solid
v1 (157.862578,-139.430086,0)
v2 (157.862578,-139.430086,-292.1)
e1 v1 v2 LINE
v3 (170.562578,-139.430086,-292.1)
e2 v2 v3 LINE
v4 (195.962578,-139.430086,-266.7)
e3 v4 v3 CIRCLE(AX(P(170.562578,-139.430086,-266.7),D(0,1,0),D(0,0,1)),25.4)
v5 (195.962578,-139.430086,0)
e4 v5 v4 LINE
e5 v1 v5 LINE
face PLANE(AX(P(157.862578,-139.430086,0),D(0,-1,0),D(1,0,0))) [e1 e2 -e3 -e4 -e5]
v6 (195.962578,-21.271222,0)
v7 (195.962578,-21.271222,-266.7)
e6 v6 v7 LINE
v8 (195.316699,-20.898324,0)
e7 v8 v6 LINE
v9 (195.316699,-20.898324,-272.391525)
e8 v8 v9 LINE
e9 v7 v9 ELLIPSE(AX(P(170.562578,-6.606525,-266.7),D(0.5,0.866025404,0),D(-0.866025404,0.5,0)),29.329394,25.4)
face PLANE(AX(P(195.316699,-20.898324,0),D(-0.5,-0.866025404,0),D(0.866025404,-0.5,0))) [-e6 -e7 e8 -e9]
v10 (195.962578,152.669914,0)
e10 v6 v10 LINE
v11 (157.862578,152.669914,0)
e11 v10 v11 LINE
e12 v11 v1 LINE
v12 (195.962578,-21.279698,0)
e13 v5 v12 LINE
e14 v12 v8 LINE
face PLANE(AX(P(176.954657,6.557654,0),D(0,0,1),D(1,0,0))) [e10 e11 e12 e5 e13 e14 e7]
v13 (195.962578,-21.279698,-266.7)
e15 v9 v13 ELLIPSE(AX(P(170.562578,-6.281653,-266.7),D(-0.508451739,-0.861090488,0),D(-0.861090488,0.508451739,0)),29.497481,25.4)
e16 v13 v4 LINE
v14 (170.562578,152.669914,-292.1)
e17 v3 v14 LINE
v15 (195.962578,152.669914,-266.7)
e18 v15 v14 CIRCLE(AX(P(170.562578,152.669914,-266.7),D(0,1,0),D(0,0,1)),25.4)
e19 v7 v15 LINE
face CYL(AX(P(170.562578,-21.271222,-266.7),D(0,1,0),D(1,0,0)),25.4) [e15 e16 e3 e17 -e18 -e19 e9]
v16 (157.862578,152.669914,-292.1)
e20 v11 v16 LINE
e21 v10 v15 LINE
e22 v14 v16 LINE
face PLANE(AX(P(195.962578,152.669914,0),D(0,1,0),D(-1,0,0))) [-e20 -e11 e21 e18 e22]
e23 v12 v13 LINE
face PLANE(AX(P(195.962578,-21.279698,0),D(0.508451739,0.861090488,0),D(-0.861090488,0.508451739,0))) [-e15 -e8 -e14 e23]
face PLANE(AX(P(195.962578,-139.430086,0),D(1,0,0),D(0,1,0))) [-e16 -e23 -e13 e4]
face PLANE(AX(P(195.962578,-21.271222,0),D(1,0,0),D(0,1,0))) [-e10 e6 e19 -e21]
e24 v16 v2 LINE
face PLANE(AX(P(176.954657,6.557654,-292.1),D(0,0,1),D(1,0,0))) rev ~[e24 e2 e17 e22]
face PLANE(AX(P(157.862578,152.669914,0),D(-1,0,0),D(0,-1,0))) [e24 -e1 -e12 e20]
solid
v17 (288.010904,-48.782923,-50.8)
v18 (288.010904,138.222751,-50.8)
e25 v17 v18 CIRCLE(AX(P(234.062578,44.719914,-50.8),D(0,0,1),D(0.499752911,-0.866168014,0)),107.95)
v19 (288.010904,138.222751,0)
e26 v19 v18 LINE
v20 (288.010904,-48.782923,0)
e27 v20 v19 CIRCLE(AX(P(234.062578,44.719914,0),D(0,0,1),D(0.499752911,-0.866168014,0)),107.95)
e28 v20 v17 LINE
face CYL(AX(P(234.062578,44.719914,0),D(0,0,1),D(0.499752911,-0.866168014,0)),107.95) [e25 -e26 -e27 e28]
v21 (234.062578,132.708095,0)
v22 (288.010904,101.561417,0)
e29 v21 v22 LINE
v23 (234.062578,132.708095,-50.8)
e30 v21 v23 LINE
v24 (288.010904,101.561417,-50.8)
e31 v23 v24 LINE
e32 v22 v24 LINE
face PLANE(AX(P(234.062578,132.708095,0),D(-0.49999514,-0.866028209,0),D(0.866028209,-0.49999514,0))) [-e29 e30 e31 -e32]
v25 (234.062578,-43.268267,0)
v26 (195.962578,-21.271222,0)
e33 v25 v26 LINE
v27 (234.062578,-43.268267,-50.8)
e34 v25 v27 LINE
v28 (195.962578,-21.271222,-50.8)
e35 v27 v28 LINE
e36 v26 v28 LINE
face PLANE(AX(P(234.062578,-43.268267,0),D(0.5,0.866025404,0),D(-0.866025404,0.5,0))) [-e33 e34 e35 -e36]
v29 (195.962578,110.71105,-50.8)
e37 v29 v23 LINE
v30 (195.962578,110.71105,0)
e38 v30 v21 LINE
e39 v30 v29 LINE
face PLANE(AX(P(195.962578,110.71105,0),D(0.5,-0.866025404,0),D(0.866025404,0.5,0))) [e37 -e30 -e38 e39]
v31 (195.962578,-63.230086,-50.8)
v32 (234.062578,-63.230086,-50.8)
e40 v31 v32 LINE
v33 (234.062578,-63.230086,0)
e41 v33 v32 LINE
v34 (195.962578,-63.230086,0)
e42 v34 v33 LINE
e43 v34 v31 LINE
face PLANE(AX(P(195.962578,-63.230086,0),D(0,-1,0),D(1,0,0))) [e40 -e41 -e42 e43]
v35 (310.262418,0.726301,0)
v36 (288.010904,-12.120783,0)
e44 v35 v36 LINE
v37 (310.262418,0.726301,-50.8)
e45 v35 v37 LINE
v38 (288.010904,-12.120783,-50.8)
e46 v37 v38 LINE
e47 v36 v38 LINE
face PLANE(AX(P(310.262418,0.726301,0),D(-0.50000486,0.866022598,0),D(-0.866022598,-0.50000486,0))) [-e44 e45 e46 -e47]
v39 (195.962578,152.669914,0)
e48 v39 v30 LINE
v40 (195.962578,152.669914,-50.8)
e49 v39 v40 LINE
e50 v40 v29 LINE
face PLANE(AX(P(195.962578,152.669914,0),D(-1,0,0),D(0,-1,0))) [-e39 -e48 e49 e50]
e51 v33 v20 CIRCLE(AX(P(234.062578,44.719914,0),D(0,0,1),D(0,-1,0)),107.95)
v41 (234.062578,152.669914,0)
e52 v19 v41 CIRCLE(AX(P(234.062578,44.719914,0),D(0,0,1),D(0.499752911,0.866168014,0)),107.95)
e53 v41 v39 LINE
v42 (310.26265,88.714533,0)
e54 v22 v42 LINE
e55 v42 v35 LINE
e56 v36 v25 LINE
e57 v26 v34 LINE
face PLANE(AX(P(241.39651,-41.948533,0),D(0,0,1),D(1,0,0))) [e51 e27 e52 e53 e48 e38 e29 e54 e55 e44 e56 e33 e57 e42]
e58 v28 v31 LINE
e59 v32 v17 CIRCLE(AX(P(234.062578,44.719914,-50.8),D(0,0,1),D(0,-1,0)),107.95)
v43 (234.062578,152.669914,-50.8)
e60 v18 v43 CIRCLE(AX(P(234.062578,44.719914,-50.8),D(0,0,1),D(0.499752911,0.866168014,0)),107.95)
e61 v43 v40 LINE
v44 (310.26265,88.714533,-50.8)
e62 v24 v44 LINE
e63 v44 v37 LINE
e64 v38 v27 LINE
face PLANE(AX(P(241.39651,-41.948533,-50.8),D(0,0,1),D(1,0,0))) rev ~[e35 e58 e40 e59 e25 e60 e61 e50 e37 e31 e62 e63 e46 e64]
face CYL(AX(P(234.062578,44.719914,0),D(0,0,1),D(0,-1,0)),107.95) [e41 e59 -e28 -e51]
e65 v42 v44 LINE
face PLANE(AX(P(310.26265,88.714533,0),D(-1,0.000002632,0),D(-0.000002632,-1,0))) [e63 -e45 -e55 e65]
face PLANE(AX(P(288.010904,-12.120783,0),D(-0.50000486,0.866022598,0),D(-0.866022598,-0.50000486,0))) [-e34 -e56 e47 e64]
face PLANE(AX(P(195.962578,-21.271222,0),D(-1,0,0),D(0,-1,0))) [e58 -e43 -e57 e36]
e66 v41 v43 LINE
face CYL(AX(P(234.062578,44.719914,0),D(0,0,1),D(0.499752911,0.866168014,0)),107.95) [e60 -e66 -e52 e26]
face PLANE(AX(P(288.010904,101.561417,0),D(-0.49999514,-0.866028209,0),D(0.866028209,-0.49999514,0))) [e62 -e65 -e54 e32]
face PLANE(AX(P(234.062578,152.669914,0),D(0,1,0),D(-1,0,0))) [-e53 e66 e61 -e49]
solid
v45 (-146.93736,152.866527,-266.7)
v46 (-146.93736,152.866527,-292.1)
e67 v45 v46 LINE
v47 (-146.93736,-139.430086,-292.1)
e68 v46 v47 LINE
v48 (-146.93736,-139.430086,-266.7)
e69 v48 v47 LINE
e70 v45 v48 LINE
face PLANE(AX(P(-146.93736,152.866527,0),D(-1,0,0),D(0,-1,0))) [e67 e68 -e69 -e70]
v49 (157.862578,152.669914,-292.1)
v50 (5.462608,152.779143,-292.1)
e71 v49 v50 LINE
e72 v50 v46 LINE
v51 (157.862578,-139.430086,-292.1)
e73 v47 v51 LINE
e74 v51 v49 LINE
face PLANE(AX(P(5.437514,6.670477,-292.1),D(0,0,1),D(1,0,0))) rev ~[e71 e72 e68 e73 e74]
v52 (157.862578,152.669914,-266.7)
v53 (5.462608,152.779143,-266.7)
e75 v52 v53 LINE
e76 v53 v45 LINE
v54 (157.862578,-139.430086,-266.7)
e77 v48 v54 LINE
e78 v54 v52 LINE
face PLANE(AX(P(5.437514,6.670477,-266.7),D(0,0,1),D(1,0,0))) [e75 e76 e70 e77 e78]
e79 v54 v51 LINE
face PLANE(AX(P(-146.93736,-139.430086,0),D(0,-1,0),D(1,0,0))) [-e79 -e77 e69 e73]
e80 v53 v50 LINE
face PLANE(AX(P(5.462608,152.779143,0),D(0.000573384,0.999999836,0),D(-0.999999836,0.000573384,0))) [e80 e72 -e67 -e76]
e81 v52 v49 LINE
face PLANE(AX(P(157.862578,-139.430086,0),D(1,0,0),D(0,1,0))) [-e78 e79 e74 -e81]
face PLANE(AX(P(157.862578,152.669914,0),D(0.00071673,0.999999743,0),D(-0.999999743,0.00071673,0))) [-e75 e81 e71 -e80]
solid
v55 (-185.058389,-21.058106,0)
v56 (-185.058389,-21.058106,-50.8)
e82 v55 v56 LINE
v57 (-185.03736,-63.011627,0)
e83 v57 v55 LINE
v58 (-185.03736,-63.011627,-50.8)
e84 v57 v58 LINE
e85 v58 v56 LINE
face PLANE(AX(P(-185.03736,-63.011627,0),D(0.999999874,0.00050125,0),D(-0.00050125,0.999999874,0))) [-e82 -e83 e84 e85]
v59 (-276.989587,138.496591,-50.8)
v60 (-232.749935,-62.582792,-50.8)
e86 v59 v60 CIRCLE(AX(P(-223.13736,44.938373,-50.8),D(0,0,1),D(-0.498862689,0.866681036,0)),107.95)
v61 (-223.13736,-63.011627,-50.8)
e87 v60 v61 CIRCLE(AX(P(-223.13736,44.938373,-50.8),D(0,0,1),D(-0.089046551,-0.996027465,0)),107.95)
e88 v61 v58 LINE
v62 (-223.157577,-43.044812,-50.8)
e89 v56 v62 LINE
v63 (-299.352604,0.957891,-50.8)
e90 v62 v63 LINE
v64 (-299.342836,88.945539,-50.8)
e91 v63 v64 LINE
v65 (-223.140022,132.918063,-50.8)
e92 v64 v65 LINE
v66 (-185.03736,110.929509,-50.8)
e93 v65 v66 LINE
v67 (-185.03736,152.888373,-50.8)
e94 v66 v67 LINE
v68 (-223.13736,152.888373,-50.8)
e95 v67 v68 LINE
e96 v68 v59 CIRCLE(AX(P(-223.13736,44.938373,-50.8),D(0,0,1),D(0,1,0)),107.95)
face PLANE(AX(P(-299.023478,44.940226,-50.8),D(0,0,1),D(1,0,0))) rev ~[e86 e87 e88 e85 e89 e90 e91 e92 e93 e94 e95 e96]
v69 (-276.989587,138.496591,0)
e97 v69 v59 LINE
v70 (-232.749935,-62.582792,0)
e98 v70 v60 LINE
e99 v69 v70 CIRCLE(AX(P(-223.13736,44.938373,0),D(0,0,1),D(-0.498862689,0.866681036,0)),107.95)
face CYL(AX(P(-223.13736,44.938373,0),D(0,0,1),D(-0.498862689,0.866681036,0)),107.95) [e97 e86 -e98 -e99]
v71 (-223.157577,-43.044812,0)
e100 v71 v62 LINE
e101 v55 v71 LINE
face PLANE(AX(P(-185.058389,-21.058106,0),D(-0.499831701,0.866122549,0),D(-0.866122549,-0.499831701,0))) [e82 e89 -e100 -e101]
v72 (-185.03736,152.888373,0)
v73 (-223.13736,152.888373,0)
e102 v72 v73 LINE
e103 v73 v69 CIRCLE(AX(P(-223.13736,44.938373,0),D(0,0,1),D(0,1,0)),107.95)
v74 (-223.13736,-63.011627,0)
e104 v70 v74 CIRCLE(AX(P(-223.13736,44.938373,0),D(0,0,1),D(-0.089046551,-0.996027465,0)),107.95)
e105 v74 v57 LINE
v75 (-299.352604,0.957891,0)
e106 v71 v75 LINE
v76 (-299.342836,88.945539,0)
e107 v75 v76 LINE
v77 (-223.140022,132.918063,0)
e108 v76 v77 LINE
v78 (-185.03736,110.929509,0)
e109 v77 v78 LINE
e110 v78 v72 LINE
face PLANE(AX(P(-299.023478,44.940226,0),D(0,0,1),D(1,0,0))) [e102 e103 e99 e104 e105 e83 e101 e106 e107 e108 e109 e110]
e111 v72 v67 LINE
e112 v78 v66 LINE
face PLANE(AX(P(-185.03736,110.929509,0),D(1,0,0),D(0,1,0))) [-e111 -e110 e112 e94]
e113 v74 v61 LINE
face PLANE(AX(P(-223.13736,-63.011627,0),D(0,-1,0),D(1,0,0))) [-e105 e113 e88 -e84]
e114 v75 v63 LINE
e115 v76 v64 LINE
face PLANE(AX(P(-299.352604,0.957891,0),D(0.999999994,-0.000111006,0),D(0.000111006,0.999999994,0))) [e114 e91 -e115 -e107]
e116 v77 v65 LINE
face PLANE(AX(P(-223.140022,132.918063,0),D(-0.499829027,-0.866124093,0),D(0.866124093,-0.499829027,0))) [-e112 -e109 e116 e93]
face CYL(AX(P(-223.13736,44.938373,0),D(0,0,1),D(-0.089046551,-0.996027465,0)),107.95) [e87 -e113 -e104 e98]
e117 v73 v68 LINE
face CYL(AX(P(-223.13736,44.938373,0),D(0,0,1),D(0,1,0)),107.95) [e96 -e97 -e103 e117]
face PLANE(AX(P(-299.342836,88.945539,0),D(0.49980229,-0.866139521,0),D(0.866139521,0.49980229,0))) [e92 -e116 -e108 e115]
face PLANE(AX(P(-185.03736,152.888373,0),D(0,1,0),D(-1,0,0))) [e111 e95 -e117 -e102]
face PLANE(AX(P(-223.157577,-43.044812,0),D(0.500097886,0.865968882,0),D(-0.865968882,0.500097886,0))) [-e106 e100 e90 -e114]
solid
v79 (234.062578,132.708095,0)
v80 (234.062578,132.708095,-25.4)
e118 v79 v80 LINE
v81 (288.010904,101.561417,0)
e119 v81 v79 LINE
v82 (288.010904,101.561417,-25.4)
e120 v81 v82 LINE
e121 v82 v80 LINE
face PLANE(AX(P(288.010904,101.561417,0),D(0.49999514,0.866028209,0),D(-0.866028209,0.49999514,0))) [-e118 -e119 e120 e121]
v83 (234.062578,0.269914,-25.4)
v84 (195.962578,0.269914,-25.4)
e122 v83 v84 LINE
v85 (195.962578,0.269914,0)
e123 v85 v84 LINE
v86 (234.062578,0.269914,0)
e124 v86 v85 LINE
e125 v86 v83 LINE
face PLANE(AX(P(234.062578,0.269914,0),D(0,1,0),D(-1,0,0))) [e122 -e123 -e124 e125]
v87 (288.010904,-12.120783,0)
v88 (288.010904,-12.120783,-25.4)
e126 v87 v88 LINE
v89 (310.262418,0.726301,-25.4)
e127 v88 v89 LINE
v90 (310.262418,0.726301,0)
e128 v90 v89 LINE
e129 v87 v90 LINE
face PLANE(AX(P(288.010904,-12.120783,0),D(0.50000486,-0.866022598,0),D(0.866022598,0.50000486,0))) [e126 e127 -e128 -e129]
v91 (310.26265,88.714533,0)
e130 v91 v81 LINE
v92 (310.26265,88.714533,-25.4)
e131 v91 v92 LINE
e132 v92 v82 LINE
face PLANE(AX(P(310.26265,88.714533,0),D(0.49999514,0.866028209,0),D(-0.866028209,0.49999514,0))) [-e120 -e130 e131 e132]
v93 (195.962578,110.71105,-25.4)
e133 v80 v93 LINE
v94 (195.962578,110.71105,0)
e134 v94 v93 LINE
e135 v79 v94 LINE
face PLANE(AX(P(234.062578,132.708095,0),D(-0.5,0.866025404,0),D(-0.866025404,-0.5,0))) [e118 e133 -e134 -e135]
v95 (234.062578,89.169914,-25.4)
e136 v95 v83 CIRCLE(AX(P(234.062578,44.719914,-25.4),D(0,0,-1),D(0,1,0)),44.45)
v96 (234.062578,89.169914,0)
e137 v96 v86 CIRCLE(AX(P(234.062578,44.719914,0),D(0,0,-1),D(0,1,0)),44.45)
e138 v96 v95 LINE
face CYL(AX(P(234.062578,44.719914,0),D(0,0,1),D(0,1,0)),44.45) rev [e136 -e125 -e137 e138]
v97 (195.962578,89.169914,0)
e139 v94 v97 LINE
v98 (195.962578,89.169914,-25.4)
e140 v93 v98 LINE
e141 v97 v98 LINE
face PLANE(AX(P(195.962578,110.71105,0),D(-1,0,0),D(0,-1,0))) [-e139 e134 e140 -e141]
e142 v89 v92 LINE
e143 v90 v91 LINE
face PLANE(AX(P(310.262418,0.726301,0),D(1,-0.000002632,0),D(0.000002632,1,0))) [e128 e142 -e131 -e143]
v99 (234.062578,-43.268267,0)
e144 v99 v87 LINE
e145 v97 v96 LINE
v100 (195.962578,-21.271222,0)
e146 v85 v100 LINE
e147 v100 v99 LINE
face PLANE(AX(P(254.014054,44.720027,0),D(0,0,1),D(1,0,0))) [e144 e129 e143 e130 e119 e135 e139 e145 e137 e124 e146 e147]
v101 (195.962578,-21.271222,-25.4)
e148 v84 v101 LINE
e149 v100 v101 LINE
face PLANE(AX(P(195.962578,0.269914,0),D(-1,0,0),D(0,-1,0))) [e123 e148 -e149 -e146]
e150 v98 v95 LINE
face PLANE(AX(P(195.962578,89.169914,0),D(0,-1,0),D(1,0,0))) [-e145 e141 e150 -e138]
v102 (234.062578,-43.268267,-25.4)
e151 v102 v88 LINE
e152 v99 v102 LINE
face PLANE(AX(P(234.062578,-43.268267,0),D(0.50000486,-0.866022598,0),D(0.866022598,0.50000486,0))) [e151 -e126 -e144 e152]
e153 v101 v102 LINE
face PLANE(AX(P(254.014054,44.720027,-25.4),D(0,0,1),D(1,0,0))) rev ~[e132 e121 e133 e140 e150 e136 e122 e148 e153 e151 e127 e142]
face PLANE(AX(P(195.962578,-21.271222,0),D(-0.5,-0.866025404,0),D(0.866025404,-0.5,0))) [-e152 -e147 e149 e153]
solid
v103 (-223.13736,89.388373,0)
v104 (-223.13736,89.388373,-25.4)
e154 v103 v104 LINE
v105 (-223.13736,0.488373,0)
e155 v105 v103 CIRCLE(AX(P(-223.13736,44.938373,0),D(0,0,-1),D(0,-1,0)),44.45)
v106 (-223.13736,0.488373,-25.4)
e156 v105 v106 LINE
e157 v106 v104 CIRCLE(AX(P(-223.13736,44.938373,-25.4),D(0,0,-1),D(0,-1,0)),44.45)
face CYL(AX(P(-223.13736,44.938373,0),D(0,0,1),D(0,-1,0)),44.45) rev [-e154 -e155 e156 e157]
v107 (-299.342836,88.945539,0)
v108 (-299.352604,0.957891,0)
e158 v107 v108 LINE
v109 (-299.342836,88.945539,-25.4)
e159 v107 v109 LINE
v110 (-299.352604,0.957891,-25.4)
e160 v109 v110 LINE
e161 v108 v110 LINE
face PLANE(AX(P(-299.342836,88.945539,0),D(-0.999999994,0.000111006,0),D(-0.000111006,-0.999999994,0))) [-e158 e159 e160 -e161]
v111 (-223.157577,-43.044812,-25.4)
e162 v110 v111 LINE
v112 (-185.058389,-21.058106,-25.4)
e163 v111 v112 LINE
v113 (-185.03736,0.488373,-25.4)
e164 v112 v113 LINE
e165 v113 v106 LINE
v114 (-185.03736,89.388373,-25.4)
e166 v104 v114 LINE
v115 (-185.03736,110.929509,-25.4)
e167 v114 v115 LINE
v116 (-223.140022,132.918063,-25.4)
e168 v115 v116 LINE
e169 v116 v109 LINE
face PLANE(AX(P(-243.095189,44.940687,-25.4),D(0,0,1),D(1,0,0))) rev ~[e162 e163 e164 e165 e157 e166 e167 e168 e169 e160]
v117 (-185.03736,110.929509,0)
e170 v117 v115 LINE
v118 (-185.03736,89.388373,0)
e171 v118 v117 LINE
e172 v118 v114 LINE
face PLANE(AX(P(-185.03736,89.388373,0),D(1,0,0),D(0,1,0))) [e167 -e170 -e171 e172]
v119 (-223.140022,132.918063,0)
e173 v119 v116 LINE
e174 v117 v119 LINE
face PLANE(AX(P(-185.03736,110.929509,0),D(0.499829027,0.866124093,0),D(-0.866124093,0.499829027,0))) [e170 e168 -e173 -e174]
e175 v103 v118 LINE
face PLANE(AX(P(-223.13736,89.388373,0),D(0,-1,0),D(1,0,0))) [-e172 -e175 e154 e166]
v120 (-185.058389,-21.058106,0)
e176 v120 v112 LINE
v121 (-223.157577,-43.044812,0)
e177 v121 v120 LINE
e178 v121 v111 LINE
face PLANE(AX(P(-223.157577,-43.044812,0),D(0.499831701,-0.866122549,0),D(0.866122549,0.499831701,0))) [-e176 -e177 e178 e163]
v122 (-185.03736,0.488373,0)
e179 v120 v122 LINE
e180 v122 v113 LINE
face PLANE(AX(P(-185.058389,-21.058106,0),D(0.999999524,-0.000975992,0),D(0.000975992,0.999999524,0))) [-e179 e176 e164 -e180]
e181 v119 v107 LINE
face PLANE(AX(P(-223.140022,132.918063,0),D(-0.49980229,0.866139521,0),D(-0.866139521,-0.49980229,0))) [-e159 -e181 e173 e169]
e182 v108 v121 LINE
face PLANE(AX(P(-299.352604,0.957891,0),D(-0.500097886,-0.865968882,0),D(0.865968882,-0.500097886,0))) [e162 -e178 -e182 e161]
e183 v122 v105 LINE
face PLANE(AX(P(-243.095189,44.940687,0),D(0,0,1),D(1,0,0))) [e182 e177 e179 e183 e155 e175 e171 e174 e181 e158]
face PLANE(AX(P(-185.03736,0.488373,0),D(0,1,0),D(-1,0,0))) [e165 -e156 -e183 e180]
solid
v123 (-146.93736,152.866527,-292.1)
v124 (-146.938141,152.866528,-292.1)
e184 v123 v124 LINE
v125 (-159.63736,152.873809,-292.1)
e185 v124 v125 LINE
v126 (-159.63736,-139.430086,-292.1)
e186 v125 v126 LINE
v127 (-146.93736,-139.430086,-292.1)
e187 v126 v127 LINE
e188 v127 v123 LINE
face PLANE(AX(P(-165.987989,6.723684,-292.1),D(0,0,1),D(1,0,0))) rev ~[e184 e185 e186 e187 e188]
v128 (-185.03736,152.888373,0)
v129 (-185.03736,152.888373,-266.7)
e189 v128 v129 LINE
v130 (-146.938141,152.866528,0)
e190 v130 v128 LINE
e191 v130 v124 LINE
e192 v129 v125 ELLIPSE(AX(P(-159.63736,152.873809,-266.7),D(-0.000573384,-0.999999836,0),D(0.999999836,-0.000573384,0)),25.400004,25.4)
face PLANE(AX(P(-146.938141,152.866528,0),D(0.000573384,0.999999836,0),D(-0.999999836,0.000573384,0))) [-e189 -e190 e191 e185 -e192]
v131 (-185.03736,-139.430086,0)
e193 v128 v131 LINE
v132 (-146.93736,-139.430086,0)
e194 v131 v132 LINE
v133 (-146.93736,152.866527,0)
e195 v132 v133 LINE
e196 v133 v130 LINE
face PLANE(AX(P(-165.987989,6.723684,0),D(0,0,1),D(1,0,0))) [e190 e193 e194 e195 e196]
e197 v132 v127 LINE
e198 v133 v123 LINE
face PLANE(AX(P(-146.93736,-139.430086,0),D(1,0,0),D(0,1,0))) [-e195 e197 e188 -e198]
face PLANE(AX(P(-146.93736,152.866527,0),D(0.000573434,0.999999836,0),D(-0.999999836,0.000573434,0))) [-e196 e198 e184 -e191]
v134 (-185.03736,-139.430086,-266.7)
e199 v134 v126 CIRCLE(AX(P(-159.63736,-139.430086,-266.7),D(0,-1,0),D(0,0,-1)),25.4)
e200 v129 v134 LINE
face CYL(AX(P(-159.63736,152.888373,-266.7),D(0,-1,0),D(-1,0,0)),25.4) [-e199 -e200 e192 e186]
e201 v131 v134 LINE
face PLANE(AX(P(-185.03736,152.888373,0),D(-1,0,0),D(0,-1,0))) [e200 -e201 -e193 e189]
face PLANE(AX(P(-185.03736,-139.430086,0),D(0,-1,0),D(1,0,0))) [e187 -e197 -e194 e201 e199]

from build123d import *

# Parameters (mm, degrees)
F1_DEPTH = 292.1
F2_DEPTH = 292.1
F3_DEPTH = 50.8
F4_DEPTH = 25.4
F5_DEPTH = 266.7
F6_R     = 25.4
F7_F1_R  = 25.4


with BuildPart() as f1:
    # F0 (on Top) → F1 (new body)
    with BuildSketch(Plane.XY):
        Polygon((-146.9373597216, 152.8665271591), (-146.9381408057, 152.866527607), (-185.0373597216, 152.8883730943), (-185.0373597216, 110.9295088627), (-185.0373597216, 89.3883730943), (-185.0373597216, 0.4883730943), (-185.0373597216, -63.0116269057), (-185.0373597216, -139.4300862217), (-146.9373597216, -139.4300862217), (-146.9373597216, 44.938373096), align=None)
    extrude(amount=-F1_DEPTH)

    # F6
    f6_edges = [f1.edges().sort_by_distance(p)[0] for p in [
        (-185.03736, 6.729143, -292.1),
    ]]
    fillet(f6_edges, radius=F6_R)


with BuildPart() as f1b:
    # F0 (on Top) → F1, piece 2 (new body)
    with BuildSketch(Plane.XY):
        Polygon((195.9625776479, 152.6699137783), (157.8625776479, 152.6699137783), (157.8625776479, 88.7140042905), (157.8625776479, 45.4657096237), (157.8625776479, 0.725823266), (157.8625776479, -139.4300862217), (195.9625776479, -139.4300862217), (195.9625776479, -63.2300862217), (195.9625776479, -21.2796984665), (195.3166993516, -20.89832398), (195.9625776479, -21.2712219881), (195.9625776479, 0.2699137783), (195.9625776479, 89.1699137783), (195.9625776479, 110.7110495466), align=None)
    extrude(amount=-F1_DEPTH)

    # F7: fillet of radius 25.4 on 2 edges, made by hand

    # F7_f1
    f7_f1_edges = [f1b.edges().sort_by_distance(p)[0] for p in [
        (195.9625776479, 65.6993458951, -292.1),
    ]]
    fillet(f7_f1_edges, radius=F7_F1_R)


with BuildPart() as f2:
    # F0 (on Top) → F2 (new body)
    with BuildSketch(Plane.XY):
        Polygon((157.8625776479, 152.6699137783), (5.4626084624, 152.7791434367), (-146.9373597216, 152.8665271591), (-146.9373597216, 44.938373096), (-146.9373597216, -139.4300862217), (157.8625776479, -139.4300862217), (157.8625776479, 0.725823266), (157.8625776479, 45.4657096237), (157.8625776479, 88.7140042905), align=None)
    extrude(amount=-F2_DEPTH)

    # F0 (on Top) → F5 (cut)
    with BuildSketch(Plane.XY):
        Polygon((157.8625776479, 152.6699137783), (5.4626084624, 152.7791434367), (-146.9373597216, 152.8665271591), (-146.9373597216, 44.938373096), (-146.9373597216, -139.4300862217), (157.8625776479, -139.4300862217), (157.8625776479, 0.725823266), (157.8625776479, 45.4657096237), (157.8625776479, 88.7140042905), align=None)
    extrude(amount=-F5_DEPTH, mode=Mode.SUBTRACT)


with BuildPart() as f3:
    # F0 (on Top) → F3 (new body)
    with BuildSketch(Plane.XY):
        with BuildLine():
            Line((-276.9895869982, 101.8443908913), (-276.9895869982, 138.4965908913))
            ThreePointArc((-276.9895869982, 138.4965908913), (-331.0873597064, 44.9401852075), (-276.9927280161, -48.6180366586))
            Line((-276.9927280161, -48.6180366586), (-276.9927280161, -11.954959134))
            Line((-276.9927280161, -11.954959134), (-299.3526036167, 0.9578911619))
            Line((-299.3526036167, 0.9578911619), (-299.3428364707, 88.9455391374))
            Line((-299.3428364707, 88.9455391374), (-276.9895869982, 101.8443908913))
        make_face()
        with BuildLine():
            Line((-185.0373597216, 110.9295088627), (-185.0373597216, 152.8883730943))
            Line((-185.0373597216, 152.8883730943), (-223.1373597216, 152.8883730943))
            ThreePointArc((-223.1373597216, 152.8883730943), (-251.0084279539, 149.2283824701), (-276.9895869982, 138.4965908913))
            Line((-276.9895869982, 138.4965908913), (-276.9895869982, 101.8443908913))
            Line((-276.9895869982, 101.8443908913), (-223.1400223154, 132.9180633213))
            Line((-223.1400223154, 132.9180633213), (-185.0373597216, 110.9295088627))
        make_face()
        with BuildLine():
            Line((-276.9927280161, -11.954959134), (-276.9927280161, -48.6180366586))
            ThreePointArc((-276.9927280161, -48.6180366586), (-255.6304137058, -58.0053199751), (-232.7499348539, -62.5827917958))
            ThreePointArc((-232.7499348539, -62.5827917958), (-227.9484276962, -62.9043648389), (-223.1373597216, -63.0116269057))
            Line((-223.1373597216, -63.0116269057), (-185.0373597216, -63.0116269057))
            Line((-185.0373597216, -63.0116269057), (-185.0583889285, -21.0581061103))
            Line((-185.0583889285, -21.0581061103), (-223.1575768981, -43.0448122021))
            Line((-223.1575768981, -43.0448122021), (-276.9927280161, -11.954959134))
        make_face()
    extrude(amount=-F3_DEPTH)


with BuildPart() as f3b:
    # F0 (on Top) → F3, piece 2 (new body)
    with BuildSketch(Plane.XY):
        with BuildLine():
            ThreePointArc((234.0625776479, -63.2300862217), (261.9872194499, -59.5557635402), (288.0109044248, -48.7829232802))
            Line((288.0109044248, -48.7829232802), (288.0109044248, -12.1207826238))
            Line((288.0109044248, -12.1207826238), (234.0625776496, -43.2682672433))
            Line((234.0625776496, -43.2682672433), (195.9625776479, -21.2712219881))
            Line((195.9625776479, -21.2712219881), (195.9625776479, -21.2796984665))
            Line((195.9625776479, -21.2796984665), (195.9625776479, -63.2300862217))
            Line((195.9625776479, -63.2300862217), (234.0625776479, -63.2300862217))
        make_face()
        with BuildLine():
            ThreePointArc((288.0109044248, -48.7829232802), (342.0125776479, 44.7199137783), (288.0109044248, 138.2227508367))
            Line((288.0109044248, 138.2227508367), (288.0109044248, 101.5614174512))
            Line((288.0109044248, 101.5614174512), (310.2626497377, 88.71453279))
            Line((310.2626497377, 88.71453279), (310.2624181697, 0.7263013092))
            Line((310.2624181697, 0.7263013092), (288.0109044248, -12.1207826238))
            Line((288.0109044248, -12.1207826238), (288.0109044248, -48.7829232802))
        make_face()
        with BuildLine():
            Line((234.0625776479, 152.6699137783), (195.9625776479, 152.6699137783))
            Line((195.9625776479, 152.6699137783), (195.9625776479, 110.7110495466))
            Line((195.9625776479, 110.7110495466), (234.0625776479, 132.7080948028))
            Line((234.0625776479, 132.7080948028), (288.0109044248, 101.5614174512))
            Line((288.0109044248, 101.5614174512), (288.0109044248, 138.2227508367))
            ThreePointArc((288.0109044248, 138.2227508367), (261.9872194499, 148.9955910967), (234.0625776479, 152.6699137783))
        make_face()
    extrude(amount=-F3_DEPTH)


with BuildPart() as f4:
    # F0 (on Top) → F4 (new body)
    with BuildSketch(Plane.XY):
        with BuildLine():
            Line((234.0625776479, 132.7080948028), (195.9625776479, 110.7110495466))
            Line((195.9625776479, 110.7110495466), (195.9625776479, 89.1699137783))
            Line((195.9625776479, 89.1699137783), (234.0625776479, 89.1699137783))
            ThreePointArc((234.0625776479, 89.1699137783), (278.5125776479, 44.7199137783), (234.0625776479, 0.2699137783))
            Line((234.0625776479, 0.2699137783), (195.9625776479, 0.2699137783))
            Line((195.9625776479, 0.2699137783), (195.9625776479, -21.2712219881))
            Line((195.9625776479, -21.2712219881), (234.0625776496, -43.2682672433))
            Line((234.0625776496, -43.2682672433), (288.0109044248, -12.1207826238))
            Line((288.0109044248, -12.1207826238), (310.2624181697, 0.7263013092))
            Line((310.2624181697, 0.7263013092), (310.2626497377, 88.71453279))
            Line((310.2626497377, 88.71453279), (288.0109044248, 101.5614174512))
            Line((288.0109044248, 101.5614174512), (234.0625776479, 132.7080948028))
        make_face()
    extrude(amount=-F4_DEPTH)


with BuildPart() as f4b:
    # F0 (on Top) → F4, piece 2 (new body)
    with BuildSketch(Plane.XY):
        with BuildLine():
            Line((-185.0373597216, 89.3883730943), (-185.0373597216, 110.9295088627))
            Line((-185.0373597216, 110.9295088627), (-223.1400223154, 132.9180633213))
            Line((-223.1400223154, 132.9180633213), (-276.9895869982, 101.8443908913))
            Line((-276.9895869982, 101.8443908913), (-299.3428364707, 88.9455391374))
            Line((-299.3428364707, 88.9455391374), (-299.3526036167, 0.9578911619))
            Line((-299.3526036167, 0.9578911619), (-276.9927280161, -11.954959134))
            Line((-276.9927280161, -11.954959134), (-223.1575768981, -43.0448122021))
            Line((-223.1575768981, -43.0448122021), (-185.0583889285, -21.0581061103))
            Line((-185.0583889285, -21.0581061103), (-185.0373597216, 0.4883730943))
            Line((-185.0373597216, 0.4883730943), (-223.1373597216, 0.4883730943))
            ThreePointArc((-223.1373597216, 0.4883730943), (-267.5873597216, 44.9383730943), (-223.1373597216, 89.3883730943))
            Line((-223.1373597216, 89.3883730943), (-185.0373597216, 89.3883730943))
        make_face()
    extrude(amount=-F4_DEPTH)


solid = Compound([f1.part, f1b.part, f2.part, f3.part, f3b.part, f4.part, f4b.part])
